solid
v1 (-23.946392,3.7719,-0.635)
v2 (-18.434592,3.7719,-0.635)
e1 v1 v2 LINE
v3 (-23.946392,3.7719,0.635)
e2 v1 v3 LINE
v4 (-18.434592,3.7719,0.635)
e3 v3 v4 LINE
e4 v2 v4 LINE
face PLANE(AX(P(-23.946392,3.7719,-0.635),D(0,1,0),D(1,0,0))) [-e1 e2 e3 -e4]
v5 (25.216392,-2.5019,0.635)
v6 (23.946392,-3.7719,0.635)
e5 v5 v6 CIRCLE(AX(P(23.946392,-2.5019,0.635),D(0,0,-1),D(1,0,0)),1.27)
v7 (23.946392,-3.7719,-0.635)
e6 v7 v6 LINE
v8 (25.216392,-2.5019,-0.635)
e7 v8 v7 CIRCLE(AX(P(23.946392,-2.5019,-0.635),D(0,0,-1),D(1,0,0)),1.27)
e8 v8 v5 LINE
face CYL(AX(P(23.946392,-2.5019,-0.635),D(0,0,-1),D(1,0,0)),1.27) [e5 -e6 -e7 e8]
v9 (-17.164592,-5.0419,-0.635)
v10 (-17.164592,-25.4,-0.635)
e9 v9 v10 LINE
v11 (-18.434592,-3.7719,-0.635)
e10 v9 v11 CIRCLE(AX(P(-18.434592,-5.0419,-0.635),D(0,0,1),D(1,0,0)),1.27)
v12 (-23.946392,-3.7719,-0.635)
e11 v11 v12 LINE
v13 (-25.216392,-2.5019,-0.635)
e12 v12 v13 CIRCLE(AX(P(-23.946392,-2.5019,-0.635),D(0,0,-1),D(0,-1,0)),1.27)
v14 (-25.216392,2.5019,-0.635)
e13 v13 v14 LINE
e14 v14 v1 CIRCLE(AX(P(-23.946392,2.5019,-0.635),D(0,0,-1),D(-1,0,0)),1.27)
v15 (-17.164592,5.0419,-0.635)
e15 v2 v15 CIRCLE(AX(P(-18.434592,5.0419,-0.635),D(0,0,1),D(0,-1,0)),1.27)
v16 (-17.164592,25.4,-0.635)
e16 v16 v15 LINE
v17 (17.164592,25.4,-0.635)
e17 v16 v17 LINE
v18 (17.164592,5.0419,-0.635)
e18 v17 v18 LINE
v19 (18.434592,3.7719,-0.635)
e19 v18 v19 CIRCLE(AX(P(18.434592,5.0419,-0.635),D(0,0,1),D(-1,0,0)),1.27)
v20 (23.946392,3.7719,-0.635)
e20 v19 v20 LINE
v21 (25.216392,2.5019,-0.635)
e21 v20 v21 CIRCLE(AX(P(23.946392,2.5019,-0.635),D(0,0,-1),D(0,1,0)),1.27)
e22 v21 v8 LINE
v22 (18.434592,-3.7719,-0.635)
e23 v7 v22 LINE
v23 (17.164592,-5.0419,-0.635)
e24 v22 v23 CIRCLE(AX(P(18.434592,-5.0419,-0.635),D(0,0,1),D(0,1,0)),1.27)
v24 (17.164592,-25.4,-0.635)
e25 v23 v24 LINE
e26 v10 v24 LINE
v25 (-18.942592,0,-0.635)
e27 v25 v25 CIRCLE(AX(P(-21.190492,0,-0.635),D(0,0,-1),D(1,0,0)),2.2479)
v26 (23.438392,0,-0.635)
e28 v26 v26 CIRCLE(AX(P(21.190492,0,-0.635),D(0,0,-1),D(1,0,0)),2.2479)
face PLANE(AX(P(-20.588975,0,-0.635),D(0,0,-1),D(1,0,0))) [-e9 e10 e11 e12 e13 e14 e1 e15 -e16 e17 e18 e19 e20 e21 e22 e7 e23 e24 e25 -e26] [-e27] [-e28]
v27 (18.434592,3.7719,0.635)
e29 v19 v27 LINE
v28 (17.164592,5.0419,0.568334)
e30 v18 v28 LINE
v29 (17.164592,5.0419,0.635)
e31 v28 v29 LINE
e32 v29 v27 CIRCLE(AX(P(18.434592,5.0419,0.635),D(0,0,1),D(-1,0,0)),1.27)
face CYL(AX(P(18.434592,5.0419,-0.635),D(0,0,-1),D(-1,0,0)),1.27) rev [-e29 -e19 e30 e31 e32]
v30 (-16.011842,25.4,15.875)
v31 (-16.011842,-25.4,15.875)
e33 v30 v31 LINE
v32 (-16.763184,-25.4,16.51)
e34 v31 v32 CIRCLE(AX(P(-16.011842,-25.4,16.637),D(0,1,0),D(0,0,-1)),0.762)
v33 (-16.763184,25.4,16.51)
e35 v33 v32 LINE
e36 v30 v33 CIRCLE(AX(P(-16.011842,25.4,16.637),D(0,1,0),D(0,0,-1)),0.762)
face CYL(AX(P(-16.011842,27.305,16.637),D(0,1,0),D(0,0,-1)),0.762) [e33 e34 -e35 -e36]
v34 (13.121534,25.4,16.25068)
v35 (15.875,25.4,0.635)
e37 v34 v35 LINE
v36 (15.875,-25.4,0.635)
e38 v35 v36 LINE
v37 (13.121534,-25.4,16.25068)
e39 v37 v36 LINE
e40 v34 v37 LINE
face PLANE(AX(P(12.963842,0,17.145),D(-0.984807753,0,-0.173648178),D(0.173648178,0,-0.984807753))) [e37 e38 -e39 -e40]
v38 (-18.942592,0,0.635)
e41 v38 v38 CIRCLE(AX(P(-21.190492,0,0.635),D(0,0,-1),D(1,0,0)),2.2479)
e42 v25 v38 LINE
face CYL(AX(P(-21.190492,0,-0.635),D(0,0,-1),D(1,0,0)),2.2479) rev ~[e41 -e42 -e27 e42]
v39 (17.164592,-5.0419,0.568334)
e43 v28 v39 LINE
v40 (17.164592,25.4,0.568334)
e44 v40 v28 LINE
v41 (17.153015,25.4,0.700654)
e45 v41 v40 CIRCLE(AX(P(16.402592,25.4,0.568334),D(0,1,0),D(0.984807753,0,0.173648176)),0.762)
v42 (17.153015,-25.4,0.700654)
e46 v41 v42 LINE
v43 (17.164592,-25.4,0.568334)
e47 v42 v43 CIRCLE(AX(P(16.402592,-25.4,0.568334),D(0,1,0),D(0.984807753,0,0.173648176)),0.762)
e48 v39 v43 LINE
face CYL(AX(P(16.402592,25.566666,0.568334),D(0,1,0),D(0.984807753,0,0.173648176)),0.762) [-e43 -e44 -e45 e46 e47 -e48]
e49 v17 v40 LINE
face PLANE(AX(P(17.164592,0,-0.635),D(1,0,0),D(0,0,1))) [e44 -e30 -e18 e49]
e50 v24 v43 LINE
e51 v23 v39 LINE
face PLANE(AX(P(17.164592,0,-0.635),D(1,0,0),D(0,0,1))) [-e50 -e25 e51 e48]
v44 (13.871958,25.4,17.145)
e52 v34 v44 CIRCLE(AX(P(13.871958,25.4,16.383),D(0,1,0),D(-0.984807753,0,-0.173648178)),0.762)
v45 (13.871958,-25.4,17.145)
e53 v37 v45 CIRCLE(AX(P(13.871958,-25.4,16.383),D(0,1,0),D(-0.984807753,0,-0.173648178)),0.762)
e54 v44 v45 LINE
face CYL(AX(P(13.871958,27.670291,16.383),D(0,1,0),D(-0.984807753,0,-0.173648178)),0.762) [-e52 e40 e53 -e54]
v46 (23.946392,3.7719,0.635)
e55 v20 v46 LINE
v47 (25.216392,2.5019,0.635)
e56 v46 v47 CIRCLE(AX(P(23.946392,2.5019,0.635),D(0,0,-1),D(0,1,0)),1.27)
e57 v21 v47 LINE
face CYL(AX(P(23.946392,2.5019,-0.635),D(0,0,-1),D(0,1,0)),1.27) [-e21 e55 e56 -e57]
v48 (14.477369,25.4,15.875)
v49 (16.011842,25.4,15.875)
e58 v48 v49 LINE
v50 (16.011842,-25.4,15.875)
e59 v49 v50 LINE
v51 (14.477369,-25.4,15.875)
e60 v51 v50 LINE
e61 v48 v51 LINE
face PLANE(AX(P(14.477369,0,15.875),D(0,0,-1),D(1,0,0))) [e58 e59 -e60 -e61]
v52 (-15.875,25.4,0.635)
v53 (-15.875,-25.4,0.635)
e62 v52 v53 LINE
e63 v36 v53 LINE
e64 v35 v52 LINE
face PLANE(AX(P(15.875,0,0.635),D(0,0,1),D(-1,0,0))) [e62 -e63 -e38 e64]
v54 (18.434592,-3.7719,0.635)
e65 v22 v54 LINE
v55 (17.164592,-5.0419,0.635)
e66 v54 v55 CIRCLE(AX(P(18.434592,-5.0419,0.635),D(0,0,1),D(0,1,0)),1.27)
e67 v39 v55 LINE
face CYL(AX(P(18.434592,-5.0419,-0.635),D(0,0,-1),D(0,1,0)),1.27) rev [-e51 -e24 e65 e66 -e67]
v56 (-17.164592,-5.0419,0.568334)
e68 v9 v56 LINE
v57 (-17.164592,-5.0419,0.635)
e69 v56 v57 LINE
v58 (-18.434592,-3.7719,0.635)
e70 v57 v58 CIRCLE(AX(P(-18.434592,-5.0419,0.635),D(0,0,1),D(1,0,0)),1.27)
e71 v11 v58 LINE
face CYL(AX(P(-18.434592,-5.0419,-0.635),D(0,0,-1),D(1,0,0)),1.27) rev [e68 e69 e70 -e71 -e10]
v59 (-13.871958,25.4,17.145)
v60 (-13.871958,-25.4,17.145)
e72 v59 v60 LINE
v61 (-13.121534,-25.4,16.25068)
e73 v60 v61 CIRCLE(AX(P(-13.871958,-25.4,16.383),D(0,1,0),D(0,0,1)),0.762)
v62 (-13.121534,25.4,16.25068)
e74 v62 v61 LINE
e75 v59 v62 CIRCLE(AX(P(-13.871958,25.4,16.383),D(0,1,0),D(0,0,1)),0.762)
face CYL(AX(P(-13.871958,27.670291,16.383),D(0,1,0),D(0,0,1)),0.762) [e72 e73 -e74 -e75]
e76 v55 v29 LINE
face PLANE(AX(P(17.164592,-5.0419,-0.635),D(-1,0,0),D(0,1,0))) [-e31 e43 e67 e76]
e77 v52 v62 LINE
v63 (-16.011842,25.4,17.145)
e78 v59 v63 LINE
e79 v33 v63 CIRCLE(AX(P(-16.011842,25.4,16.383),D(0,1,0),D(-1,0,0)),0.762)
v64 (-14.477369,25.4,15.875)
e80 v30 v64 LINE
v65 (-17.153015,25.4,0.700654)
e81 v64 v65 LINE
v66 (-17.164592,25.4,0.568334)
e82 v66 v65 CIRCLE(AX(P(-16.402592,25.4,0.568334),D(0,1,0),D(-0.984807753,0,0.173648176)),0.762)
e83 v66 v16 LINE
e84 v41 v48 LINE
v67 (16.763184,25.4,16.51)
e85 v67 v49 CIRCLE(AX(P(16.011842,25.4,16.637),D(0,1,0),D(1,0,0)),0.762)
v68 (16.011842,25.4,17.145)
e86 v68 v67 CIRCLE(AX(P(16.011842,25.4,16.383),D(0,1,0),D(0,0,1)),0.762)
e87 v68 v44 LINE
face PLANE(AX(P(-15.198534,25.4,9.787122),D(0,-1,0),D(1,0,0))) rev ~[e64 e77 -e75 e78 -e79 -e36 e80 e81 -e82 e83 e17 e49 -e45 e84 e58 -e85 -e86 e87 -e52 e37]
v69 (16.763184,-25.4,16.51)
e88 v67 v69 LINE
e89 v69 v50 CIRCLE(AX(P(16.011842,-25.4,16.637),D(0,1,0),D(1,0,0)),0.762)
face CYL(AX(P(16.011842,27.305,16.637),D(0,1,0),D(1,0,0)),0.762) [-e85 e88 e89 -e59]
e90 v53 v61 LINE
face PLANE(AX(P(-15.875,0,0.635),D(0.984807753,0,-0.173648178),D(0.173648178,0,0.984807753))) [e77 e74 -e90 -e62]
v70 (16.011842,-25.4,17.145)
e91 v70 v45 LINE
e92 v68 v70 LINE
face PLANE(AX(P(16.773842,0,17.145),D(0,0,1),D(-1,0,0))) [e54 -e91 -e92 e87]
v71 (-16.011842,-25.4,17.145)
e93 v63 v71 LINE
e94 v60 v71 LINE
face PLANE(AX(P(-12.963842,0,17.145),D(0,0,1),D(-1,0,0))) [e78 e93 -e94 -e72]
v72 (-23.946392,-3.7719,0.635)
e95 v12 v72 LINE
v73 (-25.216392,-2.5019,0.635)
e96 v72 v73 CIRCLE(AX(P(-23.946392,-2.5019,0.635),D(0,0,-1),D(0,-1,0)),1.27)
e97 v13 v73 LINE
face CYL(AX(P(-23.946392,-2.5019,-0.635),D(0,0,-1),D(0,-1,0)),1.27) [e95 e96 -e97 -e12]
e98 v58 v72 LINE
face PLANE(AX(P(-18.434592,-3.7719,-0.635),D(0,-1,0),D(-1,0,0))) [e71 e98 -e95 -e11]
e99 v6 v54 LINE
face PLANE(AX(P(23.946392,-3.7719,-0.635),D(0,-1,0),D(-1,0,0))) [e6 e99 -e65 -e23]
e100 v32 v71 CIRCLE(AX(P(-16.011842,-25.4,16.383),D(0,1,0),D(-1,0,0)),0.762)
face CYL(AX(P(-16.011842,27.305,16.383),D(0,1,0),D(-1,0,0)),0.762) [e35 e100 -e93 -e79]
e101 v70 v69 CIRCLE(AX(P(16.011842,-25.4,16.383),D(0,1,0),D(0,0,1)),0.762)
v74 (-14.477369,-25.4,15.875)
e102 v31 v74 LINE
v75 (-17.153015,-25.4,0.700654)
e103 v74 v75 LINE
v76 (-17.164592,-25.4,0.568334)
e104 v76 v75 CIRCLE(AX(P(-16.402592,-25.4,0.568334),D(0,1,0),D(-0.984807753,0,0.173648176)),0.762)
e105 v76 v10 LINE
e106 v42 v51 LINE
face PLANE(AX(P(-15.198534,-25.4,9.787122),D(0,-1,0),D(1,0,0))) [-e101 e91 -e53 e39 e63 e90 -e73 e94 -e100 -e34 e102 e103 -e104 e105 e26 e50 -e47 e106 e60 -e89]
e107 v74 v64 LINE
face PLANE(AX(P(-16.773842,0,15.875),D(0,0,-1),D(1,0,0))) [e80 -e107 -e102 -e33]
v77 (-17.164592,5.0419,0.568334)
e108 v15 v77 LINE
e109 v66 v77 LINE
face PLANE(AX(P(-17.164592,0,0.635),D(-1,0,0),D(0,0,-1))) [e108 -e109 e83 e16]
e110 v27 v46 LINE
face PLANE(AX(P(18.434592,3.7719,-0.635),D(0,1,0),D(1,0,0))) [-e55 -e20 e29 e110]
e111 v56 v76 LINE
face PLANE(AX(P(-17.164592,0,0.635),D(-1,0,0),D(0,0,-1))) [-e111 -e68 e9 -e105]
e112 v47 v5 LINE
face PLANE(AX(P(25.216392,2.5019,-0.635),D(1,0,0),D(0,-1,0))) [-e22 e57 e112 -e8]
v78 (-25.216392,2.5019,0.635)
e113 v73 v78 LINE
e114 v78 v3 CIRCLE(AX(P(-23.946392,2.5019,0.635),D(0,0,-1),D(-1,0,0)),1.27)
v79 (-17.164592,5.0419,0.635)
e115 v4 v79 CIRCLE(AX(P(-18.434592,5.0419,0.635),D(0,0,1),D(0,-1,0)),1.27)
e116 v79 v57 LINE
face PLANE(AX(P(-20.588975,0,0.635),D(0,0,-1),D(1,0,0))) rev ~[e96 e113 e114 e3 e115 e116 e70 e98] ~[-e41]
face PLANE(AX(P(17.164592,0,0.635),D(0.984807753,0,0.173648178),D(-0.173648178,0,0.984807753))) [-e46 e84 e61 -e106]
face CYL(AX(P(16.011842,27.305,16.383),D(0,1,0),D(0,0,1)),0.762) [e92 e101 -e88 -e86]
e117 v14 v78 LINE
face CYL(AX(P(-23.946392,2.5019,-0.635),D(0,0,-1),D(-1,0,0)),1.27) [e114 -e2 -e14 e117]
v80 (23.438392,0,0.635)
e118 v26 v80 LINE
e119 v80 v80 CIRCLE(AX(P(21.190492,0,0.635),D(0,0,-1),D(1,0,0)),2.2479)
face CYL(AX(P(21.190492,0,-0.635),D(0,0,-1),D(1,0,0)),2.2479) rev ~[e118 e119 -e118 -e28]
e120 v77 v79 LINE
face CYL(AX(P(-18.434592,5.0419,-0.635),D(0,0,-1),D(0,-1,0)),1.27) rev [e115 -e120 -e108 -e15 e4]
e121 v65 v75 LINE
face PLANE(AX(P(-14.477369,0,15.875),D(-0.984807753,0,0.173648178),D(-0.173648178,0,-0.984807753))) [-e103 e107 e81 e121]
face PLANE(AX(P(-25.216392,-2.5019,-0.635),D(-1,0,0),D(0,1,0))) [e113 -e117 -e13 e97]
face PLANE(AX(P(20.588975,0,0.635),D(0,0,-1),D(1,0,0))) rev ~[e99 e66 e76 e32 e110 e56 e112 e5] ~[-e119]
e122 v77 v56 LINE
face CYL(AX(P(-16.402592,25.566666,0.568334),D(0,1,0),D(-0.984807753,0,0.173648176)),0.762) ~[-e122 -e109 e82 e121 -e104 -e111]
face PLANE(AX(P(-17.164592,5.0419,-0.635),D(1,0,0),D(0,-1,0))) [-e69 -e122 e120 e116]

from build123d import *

# Parameters (mm, degrees)
F1_DEPTH    = 25.4
F2_T1_DEPTH = 55.3405811878
F2_T3_DEPTH = 54.61
F2_T5_DEPTH = 51.133331808
F3_R        = 2.2479
F4_DEPTH    = 1.27


# Not quite as in the source:
# - a fillet or chamfer that OpenCascade refuses, or shapes differently, is made with other operations: its cross-section is extruded or revolved along the edge and cut away or added


with BuildPart() as f1:
    # F0 (on Front) → F1 (new body, symmetric)
    with BuildSketch(Plane.XZ):
        Polygon((-14.4773686111, 15.875), (-17.1645917971, 0.635), (-15.875, 0.635), (-12.9638415485, 17.145), (-16.7738415485, 17.145), (-16.7738415485, 15.875), align=None)
        Polygon((-15.875, 0.635), (-17.1645917971, 0.635), (-17.1645917971, -0.635), (17.1645917971, -0.635), (17.1645917971, 0.635), (15.875, 0.635), align=None)
        Polygon((12.9638415485, 17.145), (15.875, 0.635), (17.1645917971, 0.635), (14.4773686111, 15.875), (16.7738415485, 15.875), (16.7738415485, 17.145), align=None)
    extrude(amount=F1_DEPTH, both=True)

    # F2: fillet of radius 0.762 on 8 edges, made by hand

    # F2_s2 → F2_t1 (cut)
    with BuildSketch(Plane.XZ.offset(-27.6702905939)):
        with BuildLine():
            ThreePointArc((-13.8719577861, 17.145), (-13.2882319204, 16.8728041586), (-13.1215342783, 16.2506800886))
            Line((-13.1215342783, 16.2506800886), (-12.9638415485, 17.145))
            Line((-12.9638415485, 17.145), (-13.8719577861, 17.145))
        make_face()
        with BuildLine():
            ThreePointArc((13.1215342783, 16.2506800886), (13.2882319204, 16.8728041586), (13.8719577861, 17.145))
            Line((13.8719577861, 17.145), (12.9638415485, 17.145))
            Line((12.9638415485, 17.145), (13.1215342783, 16.2506800886))
        make_face()
    extrude(amount=F2_T1_DEPTH, mode=Mode.SUBTRACT)

    # F2_s4 → F2_t3 (cut)
    with BuildSketch(Plane.XZ.offset(-27.305)):
        with BuildLine():
            ThreePointArc((-16.7738415485, 16.383), (-16.5506569158, 16.9218153673), (-16.0118415485, 17.145))
            Line((-16.0118415485, 17.145), (-16.7738415485, 17.145))
            Line((-16.7738415485, 17.145), (-16.7738415485, 16.383))
        make_face()
        with BuildLine():
            ThreePointArc((16.0118415485, 17.145), (16.5506569158, 16.9218153673), (16.7738415485, 16.383))
            Line((16.7738415485, 16.383), (16.7738415485, 17.145))
            Line((16.7738415485, 17.145), (16.0118415485, 17.145))
        make_face()
        with BuildLine():
            ThreePointArc((-16.0118415485, 15.875), (-16.5506569158, 16.0981846327), (-16.7738415485, 16.637))
            Line((-16.7738415485, 16.637), (-16.7738415485, 15.875))
            Line((-16.7738415485, 15.875), (-16.0118415485, 15.875))
        make_face()
        with BuildLine():
            ThreePointArc((16.7738415485, 16.637), (16.5506569158, 16.0981846327), (16.0118415485, 15.875))
            Line((16.0118415485, 15.875), (16.7738415485, 15.875))
            Line((16.7738415485, 15.875), (16.7738415485, 16.637))
        make_face()
    extrude(amount=F2_T3_DEPTH, mode=Mode.SUBTRACT)

    # F2_s6 → F2_t5 (cut)
    with BuildSketch(Plane.XZ.offset(-25.566665904)):
        with BuildLine():
            ThreePointArc((-17.1530153049, 0.7006535498), (-17.161692157, 0.6347463144), (-17.1645917971, 0.5683336384))
            Line((-17.1645917971, 0.5683336384), (-17.1645917971, 0.635))
            Line((-17.1645917971, 0.635), (-17.1530153049, 0.7006535498))
        make_face()
        with BuildLine():
            ThreePointArc((17.1530153049, 0.7006535498), (17.161692157, 0.6347463144), (17.1645917971, 0.5683336384))
            Line((17.1645917971, 0.5683336384), (17.1645917971, 0.635))
            Line((17.1645917971, 0.635), (17.1530153049, 0.7006535498))
        make_face()
    extrude(amount=F2_T5_DEPTH, mode=Mode.SUBTRACT)

    # F3 (on face) → F4 (join)
    with BuildSketch(Plane(origin=(0, 0, -0.635), x_dir=(1, 0, 0), z_dir=(0, 0, -1))):
        with BuildLine():
            Line((-17.1645917971, 3.7719), (-17.1645917971, 5.0419))
            ThreePointArc((-17.1645917971, 5.0419), (-17.536566185, 4.1438743879), (-18.4345917971, 3.7719))
            Line((-18.4345917971, 3.7719), (-23.9463917971, 3.7719))
            ThreePointArc((-23.9463917971, 3.7719), (-24.8444174092, 3.3999256121), (-25.2163917971, 2.5019))
            Line((-25.2163917971, 2.5019), (-25.2163917971, -2.5019))
            ThreePointArc((-25.2163917971, -2.5019), (-24.8444174092, -3.3999256121), (-23.9463917971, -3.7719))
            Line((-23.9463917971, -3.7719), (-18.4345917971, -3.7719))
            ThreePointArc((-18.4345917971, -3.7719), (-17.536566185, -4.1438743879), (-17.1645917971, -5.0419))
            Line((-17.1645917971, -5.0419), (-17.1645917971, -3.7719))
            Line((-17.1645917971, -3.7719), (-17.1645917971, 3.7719))
        make_face()
        with Locations((-21.1904917971, 0)):
            Circle(F3_R, mode=Mode.SUBTRACT)
        with BuildLine():
            Line((23.9463917971, 3.7719), (18.4345917971, 3.7719))
            ThreePointArc((18.4345917971, 3.7719), (17.536566185, 4.1438743879), (17.1645917971, 5.0419))
            Line((17.1645917971, 5.0419), (17.1645917971, 3.7719))
            Line((17.1645917971, 3.7719), (17.1645917971, -3.7719))
            Line((17.1645917971, -3.7719), (17.1645917971, -5.0419))
            ThreePointArc((17.1645917971, -5.0419), (17.536566185, -4.1438743879), (18.4345917971, -3.7719))
            Line((18.4345917971, -3.7719), (23.9463917971, -3.7719))
            ThreePointArc((23.9463917971, -3.7719), (24.8444174092, -3.3999256121), (25.2163917971, -2.5019))
            Line((25.2163917971, -2.5019), (25.2163917971, 2.5019))
            ThreePointArc((25.2163917971, 2.5019), (24.8444174092, 3.3999256121), (23.9463917971, 3.7719))
        make_face()
        with Locations((21.1904917971, 0)):
            Circle(F3_R, mode=Mode.SUBTRACT)
    extrude(amount=-F4_DEPTH)


solid = f1.part
